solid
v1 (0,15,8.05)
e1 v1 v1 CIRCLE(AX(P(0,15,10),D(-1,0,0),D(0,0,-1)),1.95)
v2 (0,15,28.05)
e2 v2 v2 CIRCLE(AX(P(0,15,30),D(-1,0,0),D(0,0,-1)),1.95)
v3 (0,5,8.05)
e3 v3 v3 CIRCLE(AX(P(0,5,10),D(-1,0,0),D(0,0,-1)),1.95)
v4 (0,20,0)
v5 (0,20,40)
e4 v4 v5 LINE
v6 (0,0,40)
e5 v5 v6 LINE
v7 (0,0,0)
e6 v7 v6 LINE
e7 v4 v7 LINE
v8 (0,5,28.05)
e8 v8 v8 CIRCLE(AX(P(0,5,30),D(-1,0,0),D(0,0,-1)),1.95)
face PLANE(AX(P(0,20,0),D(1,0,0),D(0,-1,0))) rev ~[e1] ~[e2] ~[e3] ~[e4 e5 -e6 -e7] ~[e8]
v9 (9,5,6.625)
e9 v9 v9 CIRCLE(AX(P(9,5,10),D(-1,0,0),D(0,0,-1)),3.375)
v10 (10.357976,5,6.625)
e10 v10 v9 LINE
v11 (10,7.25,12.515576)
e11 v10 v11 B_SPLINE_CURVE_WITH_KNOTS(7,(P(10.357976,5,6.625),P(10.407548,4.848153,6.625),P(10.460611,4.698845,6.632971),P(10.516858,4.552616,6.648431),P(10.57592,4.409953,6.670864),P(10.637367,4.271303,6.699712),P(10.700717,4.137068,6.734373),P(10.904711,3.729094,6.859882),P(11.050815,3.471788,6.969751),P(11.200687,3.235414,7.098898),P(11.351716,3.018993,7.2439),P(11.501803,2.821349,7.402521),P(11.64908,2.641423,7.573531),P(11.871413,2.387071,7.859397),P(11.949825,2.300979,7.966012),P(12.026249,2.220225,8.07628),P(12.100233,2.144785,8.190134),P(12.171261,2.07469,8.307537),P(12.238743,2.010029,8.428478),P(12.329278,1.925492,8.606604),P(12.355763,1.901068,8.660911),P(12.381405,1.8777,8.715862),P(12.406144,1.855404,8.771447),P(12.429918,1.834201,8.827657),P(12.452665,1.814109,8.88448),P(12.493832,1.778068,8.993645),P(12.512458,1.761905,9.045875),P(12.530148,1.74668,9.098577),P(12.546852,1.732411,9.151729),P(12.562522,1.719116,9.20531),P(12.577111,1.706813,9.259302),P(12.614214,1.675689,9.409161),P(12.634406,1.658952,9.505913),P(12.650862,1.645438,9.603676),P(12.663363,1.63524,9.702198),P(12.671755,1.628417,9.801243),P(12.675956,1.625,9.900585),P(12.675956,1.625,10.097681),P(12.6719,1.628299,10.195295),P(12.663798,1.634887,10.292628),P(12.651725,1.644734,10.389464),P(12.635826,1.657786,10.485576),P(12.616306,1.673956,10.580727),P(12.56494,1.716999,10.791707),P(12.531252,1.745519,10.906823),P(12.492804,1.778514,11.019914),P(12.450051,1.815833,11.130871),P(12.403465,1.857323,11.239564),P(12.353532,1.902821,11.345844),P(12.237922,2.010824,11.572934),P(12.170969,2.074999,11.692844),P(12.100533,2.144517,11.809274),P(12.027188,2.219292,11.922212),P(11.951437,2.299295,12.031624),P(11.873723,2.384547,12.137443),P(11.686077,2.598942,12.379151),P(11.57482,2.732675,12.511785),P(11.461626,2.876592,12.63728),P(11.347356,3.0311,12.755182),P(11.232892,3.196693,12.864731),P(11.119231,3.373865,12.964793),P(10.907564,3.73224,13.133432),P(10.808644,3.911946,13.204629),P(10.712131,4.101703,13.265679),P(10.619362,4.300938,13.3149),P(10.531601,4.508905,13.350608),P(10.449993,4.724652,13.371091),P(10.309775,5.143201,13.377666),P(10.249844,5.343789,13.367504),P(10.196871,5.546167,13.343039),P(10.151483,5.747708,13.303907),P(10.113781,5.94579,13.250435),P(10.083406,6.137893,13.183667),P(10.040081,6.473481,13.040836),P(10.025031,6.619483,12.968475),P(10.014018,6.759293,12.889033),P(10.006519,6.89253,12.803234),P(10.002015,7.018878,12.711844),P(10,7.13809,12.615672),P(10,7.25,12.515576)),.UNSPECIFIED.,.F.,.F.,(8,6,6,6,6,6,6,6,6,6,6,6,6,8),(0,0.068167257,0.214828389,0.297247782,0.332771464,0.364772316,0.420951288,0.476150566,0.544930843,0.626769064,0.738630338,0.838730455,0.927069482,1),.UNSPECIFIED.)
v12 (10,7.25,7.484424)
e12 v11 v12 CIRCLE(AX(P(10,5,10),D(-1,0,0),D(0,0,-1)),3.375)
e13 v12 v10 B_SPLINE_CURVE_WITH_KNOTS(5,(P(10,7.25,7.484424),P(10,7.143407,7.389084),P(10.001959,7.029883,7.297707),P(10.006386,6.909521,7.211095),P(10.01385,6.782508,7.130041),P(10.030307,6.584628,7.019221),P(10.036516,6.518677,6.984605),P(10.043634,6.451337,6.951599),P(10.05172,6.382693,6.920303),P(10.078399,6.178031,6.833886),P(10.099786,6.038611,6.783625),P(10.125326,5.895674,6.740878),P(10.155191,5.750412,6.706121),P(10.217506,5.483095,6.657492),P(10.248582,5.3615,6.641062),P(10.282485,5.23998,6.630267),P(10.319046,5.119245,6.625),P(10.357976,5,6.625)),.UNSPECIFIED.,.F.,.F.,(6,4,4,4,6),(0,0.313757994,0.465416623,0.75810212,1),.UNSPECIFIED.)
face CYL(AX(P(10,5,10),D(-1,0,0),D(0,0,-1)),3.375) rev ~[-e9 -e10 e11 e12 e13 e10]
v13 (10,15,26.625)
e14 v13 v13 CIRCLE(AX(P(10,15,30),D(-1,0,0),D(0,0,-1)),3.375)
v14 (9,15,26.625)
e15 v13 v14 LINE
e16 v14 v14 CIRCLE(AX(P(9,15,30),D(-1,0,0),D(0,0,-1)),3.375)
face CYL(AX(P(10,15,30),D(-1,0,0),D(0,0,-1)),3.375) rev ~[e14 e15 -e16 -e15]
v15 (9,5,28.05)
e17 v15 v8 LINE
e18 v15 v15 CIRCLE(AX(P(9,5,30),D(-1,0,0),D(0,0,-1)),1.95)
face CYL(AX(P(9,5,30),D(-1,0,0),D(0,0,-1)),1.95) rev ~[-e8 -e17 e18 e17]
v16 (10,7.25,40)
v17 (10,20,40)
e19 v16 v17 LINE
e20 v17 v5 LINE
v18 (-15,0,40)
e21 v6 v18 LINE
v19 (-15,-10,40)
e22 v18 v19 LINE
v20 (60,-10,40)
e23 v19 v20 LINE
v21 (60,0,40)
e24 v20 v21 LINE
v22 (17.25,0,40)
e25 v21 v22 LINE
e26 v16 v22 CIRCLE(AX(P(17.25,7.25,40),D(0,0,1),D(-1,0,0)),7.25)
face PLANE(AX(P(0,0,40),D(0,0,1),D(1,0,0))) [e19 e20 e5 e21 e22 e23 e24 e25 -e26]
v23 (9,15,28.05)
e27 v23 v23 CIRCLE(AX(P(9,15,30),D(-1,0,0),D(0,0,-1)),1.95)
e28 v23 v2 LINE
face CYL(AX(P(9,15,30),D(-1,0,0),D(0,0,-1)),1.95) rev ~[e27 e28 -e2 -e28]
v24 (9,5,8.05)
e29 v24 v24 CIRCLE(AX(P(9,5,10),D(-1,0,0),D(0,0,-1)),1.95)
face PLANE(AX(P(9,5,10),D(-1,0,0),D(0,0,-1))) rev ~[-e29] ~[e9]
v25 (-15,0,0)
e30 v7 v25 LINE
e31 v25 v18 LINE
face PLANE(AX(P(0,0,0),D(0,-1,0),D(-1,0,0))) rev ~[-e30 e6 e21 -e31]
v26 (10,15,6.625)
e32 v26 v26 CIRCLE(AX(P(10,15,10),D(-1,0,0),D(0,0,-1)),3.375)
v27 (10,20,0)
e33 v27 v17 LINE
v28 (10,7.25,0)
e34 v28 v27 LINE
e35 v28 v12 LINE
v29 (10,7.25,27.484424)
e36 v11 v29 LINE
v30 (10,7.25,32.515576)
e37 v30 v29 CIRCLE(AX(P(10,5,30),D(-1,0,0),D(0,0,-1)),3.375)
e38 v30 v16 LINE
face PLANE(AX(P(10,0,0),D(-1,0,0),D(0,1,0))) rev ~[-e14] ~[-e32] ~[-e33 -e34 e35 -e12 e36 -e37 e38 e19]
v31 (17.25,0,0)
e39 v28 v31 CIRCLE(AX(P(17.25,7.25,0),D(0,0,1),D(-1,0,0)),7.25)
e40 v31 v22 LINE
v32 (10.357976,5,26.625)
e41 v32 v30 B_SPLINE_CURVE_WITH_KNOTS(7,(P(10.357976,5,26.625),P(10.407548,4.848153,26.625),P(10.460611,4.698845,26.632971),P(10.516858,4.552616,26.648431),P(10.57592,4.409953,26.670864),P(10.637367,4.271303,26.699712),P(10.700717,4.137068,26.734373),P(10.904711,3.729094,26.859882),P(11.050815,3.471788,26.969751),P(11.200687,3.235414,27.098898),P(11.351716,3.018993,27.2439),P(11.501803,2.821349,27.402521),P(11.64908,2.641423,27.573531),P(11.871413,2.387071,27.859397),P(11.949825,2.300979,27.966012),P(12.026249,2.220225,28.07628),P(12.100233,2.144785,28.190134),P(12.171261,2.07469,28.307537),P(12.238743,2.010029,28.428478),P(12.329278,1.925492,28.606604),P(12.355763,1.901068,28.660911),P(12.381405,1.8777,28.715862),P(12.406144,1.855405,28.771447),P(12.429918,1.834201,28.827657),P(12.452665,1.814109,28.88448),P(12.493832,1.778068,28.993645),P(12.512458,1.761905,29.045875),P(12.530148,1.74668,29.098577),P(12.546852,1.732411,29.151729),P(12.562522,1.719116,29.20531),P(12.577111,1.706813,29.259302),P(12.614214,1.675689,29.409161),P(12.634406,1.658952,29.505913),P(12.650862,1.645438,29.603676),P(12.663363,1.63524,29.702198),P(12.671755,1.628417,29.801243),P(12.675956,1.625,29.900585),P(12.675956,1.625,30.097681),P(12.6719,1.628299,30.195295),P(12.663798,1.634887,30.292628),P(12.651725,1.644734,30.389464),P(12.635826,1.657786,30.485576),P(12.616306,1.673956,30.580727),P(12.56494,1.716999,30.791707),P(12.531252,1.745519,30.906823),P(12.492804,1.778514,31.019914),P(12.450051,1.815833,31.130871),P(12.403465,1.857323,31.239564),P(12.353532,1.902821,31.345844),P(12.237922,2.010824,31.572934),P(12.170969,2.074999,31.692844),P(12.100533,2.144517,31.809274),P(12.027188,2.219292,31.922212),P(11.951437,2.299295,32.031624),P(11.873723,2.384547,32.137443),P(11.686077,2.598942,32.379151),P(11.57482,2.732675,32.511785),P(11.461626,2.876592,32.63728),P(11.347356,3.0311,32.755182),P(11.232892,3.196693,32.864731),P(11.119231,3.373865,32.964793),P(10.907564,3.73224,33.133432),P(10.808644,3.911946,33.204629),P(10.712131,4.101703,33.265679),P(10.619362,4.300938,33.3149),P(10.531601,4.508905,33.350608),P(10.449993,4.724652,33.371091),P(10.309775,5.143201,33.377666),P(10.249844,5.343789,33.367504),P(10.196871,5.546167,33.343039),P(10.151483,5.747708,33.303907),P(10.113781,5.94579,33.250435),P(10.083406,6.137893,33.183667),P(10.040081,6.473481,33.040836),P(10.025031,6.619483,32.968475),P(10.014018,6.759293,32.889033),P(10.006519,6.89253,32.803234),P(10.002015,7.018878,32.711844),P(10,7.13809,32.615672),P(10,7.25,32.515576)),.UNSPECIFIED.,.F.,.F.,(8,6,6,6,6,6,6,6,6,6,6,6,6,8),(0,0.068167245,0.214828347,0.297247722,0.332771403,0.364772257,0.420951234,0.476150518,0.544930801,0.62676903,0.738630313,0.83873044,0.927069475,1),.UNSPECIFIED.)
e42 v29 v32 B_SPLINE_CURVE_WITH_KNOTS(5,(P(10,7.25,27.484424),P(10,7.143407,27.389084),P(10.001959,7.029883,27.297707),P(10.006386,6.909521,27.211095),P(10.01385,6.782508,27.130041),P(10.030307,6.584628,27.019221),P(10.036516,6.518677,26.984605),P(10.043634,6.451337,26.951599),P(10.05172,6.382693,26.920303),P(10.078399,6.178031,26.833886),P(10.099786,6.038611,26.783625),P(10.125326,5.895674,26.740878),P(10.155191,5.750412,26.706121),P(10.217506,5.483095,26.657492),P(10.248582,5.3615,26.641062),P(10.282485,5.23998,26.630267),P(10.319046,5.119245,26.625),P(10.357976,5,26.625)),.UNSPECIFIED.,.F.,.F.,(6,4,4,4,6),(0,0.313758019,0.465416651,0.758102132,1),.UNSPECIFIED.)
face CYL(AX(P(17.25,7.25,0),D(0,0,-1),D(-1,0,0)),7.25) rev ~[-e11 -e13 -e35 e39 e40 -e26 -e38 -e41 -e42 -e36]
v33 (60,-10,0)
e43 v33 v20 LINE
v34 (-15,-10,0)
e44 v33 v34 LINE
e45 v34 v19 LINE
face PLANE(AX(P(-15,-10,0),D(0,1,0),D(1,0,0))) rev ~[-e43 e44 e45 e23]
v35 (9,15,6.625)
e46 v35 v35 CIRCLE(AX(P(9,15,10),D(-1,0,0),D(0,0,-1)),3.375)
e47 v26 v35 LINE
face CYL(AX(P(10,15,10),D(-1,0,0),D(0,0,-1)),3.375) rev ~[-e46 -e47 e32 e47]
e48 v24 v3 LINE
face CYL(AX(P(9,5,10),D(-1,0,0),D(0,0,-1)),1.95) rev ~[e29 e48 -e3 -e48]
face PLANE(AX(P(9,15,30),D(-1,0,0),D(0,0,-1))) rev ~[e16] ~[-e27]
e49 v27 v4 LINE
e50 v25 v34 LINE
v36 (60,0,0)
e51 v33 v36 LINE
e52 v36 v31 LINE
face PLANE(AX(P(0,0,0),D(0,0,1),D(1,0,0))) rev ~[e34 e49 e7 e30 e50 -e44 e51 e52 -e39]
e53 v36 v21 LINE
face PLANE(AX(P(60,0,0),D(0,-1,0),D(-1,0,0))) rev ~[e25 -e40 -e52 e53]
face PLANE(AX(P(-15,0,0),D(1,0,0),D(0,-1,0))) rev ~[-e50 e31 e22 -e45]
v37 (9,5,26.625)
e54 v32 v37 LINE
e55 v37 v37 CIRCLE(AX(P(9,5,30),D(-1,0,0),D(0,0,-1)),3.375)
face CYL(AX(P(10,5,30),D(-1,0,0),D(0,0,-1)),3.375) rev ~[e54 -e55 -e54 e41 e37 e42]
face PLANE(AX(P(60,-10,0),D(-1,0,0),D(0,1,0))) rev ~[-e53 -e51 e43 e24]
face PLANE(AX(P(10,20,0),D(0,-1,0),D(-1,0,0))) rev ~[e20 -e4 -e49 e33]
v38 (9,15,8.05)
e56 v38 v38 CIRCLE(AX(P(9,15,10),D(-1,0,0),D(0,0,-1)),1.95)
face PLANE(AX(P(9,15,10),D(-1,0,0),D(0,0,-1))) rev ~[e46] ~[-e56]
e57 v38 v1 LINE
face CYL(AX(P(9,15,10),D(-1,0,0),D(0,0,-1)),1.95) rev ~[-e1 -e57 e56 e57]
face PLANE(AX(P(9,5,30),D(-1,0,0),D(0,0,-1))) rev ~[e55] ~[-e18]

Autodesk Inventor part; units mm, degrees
ref_plane "YZ Plane" through (0, 0, 0) normal (1, 0, 0) x (0, 1, 0)
ref_plane "XZ Plane" through (0, 0, 0) normal (0, 1, 0) x (-1, 0, 0)
ref_plane "XY Plane" through (0, 0, 0) normal (0, 0, 1) x (1, 0, 0)
sketch "Sketch1" plane through (0, 0, 0) normal (0, 0, 1) x (1, 0, 0)
  line L0 (0, 0) -> (10, 0)
  line L1 (10, 0) -> (10, 20)
  line L2 (10, 20) -> (0, 20)
  line L3 (0, 20) -> (0, 0)
  line L4 (10, 0) -> (-15, 0)
  line L5 (-15, 0) -> (-15, -10)
  line L6 (-15, -10) -> (10, -10)
  line L7 (10, -10) -> (10, 0)
  line L8 (10, -10) -> (60, -10)
  line L9 (60, -10) -> (60, 0)
  line L10 (60, 0) -> (10, 0)
  line L11 (10, 0) -> (10, -10)
  dimension "d0" = 10
  dimension "d1" = 20
  dimension "d2" = 25
  dimension "d3" = 10
  dimension "d4" = 50
extrude "Extrusion1" add sketch "Sketch1" along normal blind 40
sketch "Sketch2" plane through (10, 20, 40) normal (1, 0, 0) x (0, 0, -1)
  line L0 (40, 0) -> (0, 0) construction
  line L1 (40, -20) -> (0, -20) construction
  line L2 (0, -20) -> (0, 0) construction
  line L3 (0, 0) -> (40, 0) construction
  line L4 (40, 0) -> (40, -20) construction
  line L5 (40, 0) -> (40, -20) construction
  line L6 (0, 0) -> (40, -20) construction
  line L7 (0, 0) -> (0, -20) construction
  line L8 (40, 0) -> (0, -20) construction
  line L9 (10, -15) -> (30, -15) construction
  line L10 (30, -15) -> (30, -5) construction
  line L11 (30, -5) -> (10, -5) construction
  line L12 (10, -5) -> (10, -15) construction
  line L13 (10, -15) -> (30, -5) construction
  line L14 (30, -15) -> (10, -5) construction
  point P0 (20, -10)
  dimension "d9" = 20
hole "Hole1" at (10, 15, 30) at (10, 15, 10) at (10, 5, 10) at (10, 5, 30) direction (-1, 0, 0) diameter 3.9 end through all counterbore diameter 6.75 counterbore depth 1
fillet "Fillet3" radius 7.25 1 edges at (10, 0, 20)
properties part number "Test Stand"
